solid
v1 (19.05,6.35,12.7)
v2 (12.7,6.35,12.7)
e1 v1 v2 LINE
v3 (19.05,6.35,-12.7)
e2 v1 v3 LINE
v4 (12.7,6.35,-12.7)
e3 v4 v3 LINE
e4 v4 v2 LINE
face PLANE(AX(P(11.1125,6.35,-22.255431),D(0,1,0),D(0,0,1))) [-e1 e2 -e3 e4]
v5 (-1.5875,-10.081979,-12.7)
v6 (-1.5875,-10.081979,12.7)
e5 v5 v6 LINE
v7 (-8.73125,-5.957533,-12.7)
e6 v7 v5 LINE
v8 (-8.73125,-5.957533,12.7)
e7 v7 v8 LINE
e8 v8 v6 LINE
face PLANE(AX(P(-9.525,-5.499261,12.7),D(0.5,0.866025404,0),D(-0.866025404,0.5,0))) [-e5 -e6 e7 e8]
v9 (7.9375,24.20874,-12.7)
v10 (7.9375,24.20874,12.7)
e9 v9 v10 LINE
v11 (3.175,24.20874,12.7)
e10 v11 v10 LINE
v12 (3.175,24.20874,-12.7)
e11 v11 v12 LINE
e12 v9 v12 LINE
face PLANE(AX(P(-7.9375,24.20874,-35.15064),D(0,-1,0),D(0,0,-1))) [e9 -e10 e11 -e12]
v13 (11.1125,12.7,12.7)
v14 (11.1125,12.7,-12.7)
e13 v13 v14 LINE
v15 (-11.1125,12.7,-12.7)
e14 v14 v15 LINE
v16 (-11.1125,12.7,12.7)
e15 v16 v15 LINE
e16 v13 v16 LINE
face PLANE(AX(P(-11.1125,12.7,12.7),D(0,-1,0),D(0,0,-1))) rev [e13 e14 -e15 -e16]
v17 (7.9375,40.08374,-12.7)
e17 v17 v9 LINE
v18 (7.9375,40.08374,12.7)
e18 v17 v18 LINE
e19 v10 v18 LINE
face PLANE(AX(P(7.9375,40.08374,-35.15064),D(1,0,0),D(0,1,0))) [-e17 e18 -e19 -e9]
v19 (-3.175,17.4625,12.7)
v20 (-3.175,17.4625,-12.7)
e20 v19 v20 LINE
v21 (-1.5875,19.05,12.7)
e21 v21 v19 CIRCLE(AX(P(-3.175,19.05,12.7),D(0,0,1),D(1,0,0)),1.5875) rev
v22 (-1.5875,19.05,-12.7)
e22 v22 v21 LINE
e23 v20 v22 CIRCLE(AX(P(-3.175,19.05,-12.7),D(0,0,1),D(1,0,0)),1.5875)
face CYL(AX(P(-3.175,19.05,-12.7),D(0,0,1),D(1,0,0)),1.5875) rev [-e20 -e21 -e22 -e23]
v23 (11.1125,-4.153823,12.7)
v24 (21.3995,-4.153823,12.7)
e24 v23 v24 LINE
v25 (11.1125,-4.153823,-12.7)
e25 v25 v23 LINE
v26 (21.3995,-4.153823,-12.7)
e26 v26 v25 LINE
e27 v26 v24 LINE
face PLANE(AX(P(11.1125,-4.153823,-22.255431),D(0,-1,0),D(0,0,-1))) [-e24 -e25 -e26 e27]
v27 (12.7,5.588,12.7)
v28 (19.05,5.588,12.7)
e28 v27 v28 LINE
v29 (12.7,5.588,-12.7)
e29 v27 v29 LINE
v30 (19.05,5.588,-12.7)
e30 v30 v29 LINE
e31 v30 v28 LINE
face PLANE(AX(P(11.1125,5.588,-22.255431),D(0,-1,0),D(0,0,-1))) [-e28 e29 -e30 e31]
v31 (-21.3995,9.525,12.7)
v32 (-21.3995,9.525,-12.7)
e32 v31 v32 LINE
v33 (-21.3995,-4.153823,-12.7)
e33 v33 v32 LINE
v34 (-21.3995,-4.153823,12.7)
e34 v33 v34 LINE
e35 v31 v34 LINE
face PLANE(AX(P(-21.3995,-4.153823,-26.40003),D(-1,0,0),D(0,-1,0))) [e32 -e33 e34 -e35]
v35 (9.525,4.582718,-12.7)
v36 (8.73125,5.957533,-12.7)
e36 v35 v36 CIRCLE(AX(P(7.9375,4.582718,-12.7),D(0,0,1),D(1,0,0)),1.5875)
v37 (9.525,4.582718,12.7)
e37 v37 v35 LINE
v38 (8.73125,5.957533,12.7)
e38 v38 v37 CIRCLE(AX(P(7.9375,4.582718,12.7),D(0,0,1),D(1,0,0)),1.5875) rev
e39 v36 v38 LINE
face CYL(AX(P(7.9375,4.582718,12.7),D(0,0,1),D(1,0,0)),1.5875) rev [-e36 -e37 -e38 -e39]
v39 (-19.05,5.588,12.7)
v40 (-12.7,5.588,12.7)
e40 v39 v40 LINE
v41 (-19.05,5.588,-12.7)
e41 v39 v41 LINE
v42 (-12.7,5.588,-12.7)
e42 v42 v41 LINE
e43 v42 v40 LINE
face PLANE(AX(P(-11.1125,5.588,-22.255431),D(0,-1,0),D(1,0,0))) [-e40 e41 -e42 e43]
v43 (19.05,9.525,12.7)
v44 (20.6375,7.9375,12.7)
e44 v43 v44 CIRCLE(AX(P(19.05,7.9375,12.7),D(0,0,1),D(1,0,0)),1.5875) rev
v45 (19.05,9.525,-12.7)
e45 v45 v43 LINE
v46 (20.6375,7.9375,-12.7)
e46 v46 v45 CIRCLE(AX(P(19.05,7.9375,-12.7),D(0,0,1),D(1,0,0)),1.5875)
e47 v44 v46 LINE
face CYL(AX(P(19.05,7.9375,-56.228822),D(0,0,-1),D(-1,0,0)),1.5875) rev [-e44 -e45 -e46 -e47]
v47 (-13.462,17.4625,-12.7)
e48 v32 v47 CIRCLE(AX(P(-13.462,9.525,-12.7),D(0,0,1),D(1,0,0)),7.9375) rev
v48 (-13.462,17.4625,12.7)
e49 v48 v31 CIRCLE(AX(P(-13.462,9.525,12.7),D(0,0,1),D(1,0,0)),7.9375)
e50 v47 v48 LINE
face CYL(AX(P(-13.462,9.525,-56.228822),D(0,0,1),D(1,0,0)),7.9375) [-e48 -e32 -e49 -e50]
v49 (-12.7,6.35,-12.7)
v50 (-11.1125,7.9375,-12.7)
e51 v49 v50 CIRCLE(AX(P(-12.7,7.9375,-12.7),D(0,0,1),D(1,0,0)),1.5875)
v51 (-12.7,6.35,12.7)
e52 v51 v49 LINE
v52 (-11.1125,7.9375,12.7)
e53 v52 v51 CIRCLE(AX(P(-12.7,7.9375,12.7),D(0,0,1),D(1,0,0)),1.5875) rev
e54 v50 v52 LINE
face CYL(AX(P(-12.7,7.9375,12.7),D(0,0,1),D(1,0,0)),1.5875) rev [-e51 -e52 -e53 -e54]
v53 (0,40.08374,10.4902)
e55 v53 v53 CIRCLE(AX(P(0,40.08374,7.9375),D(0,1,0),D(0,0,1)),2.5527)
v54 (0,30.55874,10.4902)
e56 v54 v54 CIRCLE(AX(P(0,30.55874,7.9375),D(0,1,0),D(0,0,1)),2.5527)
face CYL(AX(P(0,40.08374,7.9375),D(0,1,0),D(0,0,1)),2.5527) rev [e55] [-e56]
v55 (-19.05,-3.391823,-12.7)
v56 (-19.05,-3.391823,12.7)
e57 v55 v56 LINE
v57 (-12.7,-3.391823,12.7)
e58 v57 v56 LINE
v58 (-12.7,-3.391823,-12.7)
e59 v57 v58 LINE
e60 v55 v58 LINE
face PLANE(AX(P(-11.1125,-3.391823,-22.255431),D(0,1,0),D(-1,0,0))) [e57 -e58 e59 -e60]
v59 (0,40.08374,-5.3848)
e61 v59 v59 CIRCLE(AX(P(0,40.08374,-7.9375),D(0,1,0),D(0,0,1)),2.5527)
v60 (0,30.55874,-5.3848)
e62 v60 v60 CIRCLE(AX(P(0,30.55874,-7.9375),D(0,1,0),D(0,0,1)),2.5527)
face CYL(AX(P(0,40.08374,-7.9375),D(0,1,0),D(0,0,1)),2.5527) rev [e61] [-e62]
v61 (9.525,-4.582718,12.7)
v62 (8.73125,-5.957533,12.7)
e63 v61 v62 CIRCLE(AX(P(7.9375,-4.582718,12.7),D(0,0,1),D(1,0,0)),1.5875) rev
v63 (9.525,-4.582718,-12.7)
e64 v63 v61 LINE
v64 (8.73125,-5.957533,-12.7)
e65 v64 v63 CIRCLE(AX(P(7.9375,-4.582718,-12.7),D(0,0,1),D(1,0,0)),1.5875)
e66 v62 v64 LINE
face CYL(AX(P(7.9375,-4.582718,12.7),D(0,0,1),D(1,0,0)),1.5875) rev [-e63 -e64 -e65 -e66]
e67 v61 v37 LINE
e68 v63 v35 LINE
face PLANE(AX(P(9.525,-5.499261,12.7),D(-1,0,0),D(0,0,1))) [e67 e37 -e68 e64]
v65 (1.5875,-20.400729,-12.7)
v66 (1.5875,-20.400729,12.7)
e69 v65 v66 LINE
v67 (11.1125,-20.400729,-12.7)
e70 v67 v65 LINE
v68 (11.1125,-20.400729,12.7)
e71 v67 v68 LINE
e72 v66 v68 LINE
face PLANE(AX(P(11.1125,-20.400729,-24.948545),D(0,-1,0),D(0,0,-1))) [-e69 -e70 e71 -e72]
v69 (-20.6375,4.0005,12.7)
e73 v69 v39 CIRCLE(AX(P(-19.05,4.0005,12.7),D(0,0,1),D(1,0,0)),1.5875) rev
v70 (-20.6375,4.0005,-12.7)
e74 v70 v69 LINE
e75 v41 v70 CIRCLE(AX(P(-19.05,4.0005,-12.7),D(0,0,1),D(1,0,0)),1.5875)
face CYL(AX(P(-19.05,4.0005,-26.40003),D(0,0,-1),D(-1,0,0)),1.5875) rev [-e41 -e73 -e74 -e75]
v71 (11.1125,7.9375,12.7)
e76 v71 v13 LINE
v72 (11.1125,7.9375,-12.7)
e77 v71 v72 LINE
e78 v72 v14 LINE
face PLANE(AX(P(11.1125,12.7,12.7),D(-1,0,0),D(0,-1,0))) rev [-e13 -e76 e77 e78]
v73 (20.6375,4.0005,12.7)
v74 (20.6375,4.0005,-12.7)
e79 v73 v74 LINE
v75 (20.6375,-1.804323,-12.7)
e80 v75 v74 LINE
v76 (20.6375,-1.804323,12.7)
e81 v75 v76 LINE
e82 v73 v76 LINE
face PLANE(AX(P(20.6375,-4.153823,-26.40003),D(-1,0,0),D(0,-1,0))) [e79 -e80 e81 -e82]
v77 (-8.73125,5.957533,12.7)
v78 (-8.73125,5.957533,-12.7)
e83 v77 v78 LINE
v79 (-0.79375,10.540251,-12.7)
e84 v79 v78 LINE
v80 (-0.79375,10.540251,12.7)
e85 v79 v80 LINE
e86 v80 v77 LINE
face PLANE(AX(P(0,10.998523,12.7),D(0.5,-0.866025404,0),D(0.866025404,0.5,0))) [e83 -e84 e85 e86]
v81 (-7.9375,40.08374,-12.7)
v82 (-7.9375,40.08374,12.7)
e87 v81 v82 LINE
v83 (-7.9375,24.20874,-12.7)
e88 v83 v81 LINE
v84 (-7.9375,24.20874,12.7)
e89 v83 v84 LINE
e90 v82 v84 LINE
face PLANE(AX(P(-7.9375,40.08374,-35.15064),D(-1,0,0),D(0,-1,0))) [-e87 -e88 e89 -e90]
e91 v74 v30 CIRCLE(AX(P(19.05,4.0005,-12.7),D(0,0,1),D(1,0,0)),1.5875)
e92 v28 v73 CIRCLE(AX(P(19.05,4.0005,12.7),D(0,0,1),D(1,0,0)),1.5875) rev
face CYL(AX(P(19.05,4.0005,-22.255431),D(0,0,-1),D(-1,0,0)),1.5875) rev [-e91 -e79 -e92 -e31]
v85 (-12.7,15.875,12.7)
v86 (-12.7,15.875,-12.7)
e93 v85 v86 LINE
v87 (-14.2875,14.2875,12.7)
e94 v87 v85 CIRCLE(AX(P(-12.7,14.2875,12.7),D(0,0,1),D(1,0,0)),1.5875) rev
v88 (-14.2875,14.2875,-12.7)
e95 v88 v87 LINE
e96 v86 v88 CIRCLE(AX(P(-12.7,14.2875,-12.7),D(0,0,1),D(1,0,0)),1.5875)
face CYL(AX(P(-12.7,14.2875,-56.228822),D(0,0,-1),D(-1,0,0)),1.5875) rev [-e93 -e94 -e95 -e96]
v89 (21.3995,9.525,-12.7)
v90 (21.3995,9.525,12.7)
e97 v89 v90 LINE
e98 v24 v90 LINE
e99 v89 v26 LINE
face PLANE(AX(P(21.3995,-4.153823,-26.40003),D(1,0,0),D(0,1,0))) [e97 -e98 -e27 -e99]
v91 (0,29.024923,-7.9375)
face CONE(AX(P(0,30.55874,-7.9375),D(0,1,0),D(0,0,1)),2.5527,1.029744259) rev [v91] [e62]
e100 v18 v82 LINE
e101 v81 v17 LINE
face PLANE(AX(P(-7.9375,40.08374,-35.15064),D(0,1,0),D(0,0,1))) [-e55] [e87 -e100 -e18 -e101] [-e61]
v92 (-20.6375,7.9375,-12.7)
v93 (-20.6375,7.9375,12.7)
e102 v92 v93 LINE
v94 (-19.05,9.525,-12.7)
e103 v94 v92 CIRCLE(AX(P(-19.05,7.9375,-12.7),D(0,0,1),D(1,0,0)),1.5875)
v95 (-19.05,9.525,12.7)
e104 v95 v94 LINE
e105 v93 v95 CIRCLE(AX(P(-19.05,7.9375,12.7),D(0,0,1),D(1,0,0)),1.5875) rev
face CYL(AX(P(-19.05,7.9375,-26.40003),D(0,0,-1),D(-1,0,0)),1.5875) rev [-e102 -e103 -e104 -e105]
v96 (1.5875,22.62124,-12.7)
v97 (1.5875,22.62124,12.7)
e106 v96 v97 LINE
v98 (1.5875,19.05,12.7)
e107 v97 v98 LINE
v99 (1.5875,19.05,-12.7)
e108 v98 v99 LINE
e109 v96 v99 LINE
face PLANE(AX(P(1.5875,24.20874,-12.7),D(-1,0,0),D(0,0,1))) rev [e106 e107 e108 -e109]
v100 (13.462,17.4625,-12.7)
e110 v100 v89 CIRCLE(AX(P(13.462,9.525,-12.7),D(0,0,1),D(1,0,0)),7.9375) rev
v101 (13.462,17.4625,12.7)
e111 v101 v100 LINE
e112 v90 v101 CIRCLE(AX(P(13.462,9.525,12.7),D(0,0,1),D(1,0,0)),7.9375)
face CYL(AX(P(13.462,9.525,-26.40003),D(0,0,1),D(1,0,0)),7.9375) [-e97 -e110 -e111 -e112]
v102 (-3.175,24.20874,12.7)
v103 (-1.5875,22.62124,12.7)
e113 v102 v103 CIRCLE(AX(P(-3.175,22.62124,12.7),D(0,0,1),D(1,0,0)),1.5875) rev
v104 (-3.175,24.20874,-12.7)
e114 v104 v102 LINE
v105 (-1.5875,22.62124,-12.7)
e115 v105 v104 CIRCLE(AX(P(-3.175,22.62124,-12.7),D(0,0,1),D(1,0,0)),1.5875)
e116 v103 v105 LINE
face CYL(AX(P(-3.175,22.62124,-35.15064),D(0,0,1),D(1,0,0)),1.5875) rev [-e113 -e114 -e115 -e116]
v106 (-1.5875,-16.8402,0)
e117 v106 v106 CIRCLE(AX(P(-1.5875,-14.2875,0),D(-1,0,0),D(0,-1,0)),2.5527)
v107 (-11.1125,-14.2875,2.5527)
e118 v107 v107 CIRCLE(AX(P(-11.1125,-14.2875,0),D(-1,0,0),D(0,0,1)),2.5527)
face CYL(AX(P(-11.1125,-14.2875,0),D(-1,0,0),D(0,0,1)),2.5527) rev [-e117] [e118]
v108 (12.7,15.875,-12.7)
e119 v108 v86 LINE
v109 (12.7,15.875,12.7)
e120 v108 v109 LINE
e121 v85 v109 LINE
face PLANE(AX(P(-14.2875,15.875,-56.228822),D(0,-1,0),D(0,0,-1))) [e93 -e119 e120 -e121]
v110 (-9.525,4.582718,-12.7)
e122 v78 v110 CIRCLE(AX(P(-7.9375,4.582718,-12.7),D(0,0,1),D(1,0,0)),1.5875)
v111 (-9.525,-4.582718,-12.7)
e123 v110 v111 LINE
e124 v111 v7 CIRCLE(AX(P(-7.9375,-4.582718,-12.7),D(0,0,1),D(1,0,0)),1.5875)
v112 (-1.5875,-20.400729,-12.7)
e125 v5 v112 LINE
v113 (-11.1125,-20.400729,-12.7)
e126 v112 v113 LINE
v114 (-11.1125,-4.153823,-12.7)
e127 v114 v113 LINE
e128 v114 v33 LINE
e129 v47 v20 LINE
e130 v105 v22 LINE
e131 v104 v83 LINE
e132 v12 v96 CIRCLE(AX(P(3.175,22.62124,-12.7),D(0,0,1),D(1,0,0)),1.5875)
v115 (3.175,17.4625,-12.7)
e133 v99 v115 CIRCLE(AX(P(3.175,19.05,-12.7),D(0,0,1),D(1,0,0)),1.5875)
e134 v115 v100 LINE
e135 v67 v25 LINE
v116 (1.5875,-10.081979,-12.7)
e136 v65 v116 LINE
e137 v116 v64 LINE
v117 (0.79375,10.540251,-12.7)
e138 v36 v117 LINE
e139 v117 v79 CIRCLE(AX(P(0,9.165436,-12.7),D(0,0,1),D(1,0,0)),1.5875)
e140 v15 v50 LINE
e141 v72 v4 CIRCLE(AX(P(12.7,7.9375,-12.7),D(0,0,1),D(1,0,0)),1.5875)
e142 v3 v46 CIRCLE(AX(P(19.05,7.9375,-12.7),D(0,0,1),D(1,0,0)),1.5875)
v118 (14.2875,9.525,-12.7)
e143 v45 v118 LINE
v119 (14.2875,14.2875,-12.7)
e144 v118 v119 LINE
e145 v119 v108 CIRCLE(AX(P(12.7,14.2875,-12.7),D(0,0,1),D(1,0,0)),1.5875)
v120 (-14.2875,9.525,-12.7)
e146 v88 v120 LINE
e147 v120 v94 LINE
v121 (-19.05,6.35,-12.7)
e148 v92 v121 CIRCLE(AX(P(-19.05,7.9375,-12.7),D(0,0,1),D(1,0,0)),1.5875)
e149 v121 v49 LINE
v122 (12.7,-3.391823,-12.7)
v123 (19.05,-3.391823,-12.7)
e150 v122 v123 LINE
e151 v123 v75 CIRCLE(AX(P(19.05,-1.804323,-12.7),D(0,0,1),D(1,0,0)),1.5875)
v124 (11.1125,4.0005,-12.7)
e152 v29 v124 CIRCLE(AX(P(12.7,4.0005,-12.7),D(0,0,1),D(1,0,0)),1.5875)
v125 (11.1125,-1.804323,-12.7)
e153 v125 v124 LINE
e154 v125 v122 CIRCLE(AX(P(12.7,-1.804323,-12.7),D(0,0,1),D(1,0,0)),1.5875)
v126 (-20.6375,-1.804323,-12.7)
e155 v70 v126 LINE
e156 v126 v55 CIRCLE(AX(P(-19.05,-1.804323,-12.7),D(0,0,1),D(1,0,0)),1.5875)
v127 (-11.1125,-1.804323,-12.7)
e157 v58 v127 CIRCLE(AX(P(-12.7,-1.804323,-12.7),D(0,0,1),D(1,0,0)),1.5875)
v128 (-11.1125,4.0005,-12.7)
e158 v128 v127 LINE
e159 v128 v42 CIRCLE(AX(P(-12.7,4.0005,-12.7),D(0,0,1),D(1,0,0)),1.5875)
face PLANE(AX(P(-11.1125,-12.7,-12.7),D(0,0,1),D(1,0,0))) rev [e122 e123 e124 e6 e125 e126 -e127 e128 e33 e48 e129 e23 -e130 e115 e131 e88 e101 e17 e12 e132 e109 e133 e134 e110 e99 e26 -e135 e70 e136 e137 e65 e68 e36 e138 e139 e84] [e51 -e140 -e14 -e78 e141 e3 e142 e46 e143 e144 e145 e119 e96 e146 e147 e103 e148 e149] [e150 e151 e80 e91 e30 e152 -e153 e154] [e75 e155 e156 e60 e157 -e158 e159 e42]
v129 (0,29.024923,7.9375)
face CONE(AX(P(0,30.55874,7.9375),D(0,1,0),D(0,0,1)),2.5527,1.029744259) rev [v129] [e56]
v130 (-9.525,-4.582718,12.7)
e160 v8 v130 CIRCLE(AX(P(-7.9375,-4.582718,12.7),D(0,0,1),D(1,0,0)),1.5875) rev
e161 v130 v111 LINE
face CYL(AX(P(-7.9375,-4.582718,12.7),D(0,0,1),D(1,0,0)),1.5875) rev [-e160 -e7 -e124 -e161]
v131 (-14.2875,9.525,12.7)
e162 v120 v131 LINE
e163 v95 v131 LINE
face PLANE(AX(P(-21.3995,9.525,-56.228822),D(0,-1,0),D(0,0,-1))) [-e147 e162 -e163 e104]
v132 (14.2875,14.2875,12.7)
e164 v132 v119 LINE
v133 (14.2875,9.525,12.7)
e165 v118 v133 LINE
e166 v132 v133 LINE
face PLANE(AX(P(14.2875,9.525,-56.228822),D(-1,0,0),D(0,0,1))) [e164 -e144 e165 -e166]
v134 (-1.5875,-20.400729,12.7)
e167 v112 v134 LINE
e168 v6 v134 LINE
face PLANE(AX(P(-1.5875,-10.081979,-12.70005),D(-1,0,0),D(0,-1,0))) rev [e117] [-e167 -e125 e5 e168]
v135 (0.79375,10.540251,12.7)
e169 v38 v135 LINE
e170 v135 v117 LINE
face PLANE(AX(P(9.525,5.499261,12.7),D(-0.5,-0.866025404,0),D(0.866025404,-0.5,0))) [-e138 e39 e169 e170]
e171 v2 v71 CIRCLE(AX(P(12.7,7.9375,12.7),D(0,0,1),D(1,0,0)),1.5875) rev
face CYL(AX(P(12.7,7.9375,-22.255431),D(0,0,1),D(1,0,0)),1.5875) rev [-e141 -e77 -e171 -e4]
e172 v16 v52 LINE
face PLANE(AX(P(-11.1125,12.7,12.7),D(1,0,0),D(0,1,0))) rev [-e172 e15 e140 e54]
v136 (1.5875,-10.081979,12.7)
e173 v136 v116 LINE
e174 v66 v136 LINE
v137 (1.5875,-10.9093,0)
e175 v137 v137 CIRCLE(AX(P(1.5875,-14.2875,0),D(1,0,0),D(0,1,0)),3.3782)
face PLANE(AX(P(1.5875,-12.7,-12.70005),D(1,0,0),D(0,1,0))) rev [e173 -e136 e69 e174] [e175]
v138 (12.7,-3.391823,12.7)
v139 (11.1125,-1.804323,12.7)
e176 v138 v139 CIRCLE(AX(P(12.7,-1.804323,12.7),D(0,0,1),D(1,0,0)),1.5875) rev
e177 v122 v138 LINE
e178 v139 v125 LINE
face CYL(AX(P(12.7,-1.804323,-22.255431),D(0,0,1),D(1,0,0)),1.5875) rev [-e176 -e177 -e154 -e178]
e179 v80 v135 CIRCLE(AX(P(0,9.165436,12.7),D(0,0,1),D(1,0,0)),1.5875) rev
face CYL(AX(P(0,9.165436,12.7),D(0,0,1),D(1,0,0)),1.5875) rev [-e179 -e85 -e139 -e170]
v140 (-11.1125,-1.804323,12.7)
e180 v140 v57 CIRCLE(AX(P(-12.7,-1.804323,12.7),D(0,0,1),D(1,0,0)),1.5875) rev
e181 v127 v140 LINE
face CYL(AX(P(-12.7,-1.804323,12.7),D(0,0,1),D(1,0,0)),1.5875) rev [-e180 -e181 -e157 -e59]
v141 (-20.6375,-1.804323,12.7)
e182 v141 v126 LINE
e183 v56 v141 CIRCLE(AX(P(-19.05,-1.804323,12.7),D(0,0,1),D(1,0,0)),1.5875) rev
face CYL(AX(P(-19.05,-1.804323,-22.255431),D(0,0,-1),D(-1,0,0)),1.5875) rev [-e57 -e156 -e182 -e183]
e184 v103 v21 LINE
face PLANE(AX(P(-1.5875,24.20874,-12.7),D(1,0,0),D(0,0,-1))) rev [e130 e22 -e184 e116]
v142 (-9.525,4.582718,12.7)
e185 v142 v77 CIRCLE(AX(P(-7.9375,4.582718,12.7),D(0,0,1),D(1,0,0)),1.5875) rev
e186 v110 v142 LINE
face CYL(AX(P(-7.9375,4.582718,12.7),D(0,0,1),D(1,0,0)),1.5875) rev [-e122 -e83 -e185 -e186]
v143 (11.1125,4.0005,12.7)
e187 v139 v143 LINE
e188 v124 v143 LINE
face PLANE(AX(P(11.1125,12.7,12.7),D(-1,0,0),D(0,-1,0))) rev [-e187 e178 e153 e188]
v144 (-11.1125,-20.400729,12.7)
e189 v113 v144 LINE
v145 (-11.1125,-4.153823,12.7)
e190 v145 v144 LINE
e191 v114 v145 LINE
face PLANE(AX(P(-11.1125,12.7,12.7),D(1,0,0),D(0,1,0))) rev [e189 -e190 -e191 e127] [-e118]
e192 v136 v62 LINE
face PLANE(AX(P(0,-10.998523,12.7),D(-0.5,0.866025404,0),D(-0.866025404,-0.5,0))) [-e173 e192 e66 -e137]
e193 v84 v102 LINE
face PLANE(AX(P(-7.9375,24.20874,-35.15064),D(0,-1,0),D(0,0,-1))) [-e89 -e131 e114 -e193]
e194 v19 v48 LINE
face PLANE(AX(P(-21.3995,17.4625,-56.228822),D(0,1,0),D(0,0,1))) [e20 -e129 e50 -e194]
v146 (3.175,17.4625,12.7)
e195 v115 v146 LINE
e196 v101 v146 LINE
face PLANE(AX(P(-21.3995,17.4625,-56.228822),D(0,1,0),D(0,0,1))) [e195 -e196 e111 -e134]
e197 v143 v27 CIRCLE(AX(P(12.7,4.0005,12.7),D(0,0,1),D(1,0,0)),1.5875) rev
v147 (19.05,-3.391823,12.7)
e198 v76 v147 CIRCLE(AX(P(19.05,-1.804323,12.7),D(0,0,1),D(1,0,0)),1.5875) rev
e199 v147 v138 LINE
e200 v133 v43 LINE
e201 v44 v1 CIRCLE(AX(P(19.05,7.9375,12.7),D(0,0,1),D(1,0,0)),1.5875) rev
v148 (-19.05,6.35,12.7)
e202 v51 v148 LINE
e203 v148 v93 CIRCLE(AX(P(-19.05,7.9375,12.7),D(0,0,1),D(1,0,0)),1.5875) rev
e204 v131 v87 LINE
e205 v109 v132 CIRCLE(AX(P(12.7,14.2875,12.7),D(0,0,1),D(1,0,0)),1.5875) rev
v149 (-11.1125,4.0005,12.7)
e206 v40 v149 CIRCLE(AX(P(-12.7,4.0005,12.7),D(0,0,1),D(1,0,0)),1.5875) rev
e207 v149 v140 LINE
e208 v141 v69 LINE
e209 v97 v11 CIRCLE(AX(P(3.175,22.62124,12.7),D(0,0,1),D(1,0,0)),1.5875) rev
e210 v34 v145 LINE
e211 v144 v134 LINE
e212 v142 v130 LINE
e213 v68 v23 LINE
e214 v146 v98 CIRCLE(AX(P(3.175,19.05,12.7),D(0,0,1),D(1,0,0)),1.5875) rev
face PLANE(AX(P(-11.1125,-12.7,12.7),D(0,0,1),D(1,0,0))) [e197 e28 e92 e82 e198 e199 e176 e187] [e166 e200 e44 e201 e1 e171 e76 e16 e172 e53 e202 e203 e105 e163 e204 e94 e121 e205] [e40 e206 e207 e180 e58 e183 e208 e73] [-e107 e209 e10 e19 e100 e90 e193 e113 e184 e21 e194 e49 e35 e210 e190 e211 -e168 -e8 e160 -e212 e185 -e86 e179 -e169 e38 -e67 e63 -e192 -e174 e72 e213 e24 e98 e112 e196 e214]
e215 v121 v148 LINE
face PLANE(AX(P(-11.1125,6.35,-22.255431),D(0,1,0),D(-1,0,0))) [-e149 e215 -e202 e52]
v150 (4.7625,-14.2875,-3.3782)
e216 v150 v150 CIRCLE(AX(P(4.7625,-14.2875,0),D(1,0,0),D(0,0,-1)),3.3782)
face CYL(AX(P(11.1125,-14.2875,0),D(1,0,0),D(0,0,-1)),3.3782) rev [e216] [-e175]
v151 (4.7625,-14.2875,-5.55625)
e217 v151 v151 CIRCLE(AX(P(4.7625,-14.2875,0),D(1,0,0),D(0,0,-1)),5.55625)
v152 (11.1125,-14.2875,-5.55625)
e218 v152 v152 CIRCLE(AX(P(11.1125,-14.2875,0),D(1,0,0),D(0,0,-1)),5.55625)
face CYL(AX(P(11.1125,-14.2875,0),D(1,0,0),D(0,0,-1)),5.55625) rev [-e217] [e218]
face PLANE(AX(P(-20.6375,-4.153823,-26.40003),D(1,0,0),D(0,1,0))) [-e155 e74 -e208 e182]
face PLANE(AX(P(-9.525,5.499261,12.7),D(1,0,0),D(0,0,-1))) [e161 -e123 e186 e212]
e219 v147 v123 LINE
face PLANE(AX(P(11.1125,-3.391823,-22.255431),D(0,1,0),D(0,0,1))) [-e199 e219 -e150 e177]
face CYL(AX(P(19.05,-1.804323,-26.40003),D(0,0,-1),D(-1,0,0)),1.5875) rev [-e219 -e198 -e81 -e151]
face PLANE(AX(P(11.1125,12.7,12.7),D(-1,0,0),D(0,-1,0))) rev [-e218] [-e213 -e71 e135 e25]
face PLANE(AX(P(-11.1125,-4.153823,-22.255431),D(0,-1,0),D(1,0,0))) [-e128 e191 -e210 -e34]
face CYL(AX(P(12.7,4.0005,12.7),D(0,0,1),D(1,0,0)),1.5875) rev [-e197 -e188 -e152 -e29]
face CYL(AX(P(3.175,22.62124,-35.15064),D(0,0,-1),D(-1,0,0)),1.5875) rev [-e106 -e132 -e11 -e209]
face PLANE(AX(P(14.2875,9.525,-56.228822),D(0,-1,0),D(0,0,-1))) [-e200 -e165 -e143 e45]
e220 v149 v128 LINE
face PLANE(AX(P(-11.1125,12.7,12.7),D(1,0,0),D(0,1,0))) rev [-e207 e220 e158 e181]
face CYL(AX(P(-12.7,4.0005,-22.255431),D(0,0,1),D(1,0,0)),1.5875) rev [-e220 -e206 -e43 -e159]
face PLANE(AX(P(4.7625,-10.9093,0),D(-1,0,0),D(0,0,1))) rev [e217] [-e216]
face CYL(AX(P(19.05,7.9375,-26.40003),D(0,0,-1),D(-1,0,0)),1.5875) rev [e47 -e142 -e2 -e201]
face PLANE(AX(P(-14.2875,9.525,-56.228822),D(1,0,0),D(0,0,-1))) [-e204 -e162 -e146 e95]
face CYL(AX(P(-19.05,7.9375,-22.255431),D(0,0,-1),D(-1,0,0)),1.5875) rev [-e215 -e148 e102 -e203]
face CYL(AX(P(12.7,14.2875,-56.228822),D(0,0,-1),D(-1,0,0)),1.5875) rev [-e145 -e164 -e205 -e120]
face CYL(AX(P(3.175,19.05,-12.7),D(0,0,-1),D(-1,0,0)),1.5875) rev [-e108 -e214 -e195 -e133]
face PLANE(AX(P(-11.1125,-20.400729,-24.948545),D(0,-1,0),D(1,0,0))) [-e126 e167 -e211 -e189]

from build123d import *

# Parameters (mm, degrees)
SKETCH1_W                                        = 22.225
SKETCH1_H                                        = 25.4
EXTRUDE1_DEPTH                                   = 12.7
SKETCH2_W                                        = 9.525
SKETCH2_H                                        = 0.762
EXTRUDE2_DEPTH                                   = 25.4
SKETCH3_W                                        = 0.762
SKETCH3_H                                        = 13.678822609
EXTRUDE3_DEPTH                                   = 25.4
EXTRUDE4_DEPTH                                   = 25.4
SKETCH7_W                                        = 3.175
SKETCH7_H                                        = 25.4
EXTRUDE5_DEPTH                                   = 6.74624
SKETCH8_W                                        = 15.875
SKETCH8_H                                        = 15.875
EXTRUDE6_DEPTH                                   = 25.4
F_1_4_20_TAPPED_HOLE1_D                          = 5.1054
F_1_4_20_TAPPED_HOLE1_DEPTH                      = 9.525
F_1_4_20_TAPPED_HOLE1_TIP                        = 1.533816902
EXTRUDE7_DEPTH                                   = 53.055785583
SKETCH10_W                                       = 9.525
SKETCH10_H                                       = 7.700729076
EXTRUDE8_DEPTH                                   = 25.4
CBORE_FOR_1_4_SOCKET_HEAD_CAP_SCREW1_D           = 6.7564
CBORE_FOR_1_4_SOCKET_HEAD_CAP_SCREW1_DEPTH       = 9.525
CBORE_FOR_1_4_SOCKET_HEAD_CAP_SCREW1_CBORE_D     = 11.1125
CBORE_FOR_1_4_SOCKET_HEAD_CAP_SCREW1_CBORE_DEPTH = 6.35
F_1_4_20_TAPPED_HOLE2_D                          = 5.1054
FILLET1_R                                        = 1.5875
FILLET2_R                                        = 7.9375


with BuildPart() as part:
    # Sketch1 → Extrude1 (new, symmetric)
    with BuildSketch(Plane.XY):
        Rectangle(SKETCH1_W, SKETCH1_H)
        Polygon((0, 10.998522628), (-9.525, 5.499261314), (-9.525, -5.499261314), (0, -10.998522628), (9.525, -5.499261314), (9.525, 5.499261314), align=None, mode=Mode.SUBTRACT)
    extrude(amount=EXTRUDE1_DEPTH, both=True)

    # Sketch2 → Extrude2 (add)
    with BuildSketch(Plane.XY.offset(12.7)):
        with Locations((15.875, 5.969)):
            Rectangle(SKETCH2_W, SKETCH2_H)
        with Locations((15.875, -3.772822609)):
            Rectangle(SKETCH2_W, SKETCH2_H)
        with Locations((-15.875, -3.772822609)):
            Rectangle(SKETCH2_W, SKETCH2_H)
        with Locations((-15.875, 5.969)):
            Rectangle(SKETCH2_W, SKETCH2_H)
    extrude(amount=-EXTRUDE2_DEPTH)

    # Sketch3 → Extrude3 (add)
    with BuildSketch(Plane.XY.offset(12.7)):
        with Locations((21.0185, 2.685588695)):
            Rectangle(SKETCH3_W, SKETCH3_H)
        with Locations((-21.0185, 2.685588695)):
            Rectangle(SKETCH3_W, SKETCH3_H)
    extrude(amount=-EXTRUDE3_DEPTH)

    # Sketch4 → Extrude4 (add)
    with BuildSketch(Plane.XY.offset(12.7)):
        Polygon((-21.3995, 17.4625), (21.3995, 17.4625), (21.3995, 9.525), (14.2875, 9.525), (14.2875, 15.875), (-14.2875, 15.875), (-14.2875, 9.525), (-21.3995, 9.525), align=None)
    extrude(amount=-EXTRUDE4_DEPTH)

    # Sketch7 → Extrude5 (add)
    with BuildSketch(Plane(origin=(0, 17.4625, 0), x_dir=(1, 0, 0), z_dir=(0, 1, 0))):
        Rectangle(SKETCH7_W, SKETCH7_H)
    extrude(amount=EXTRUDE5_DEPTH)

    # Sketch8 → Extrude6 (add)
    with BuildSketch(Plane.XY.offset(12.7)):
        with Locations((0, 32.14624)):
            Rectangle(SKETCH8_W, SKETCH8_H)
    extrude(amount=-EXTRUDE6_DEPTH)

    # 1/4-20 Tapped Hole1
    with Locations(Plane(origin=(-10.978640872, 40.08374, -1.669383244), x_dir=(-1, 0, 0), z_dir=(0, 1, 0))):
        with Locations((-10.978640872, -6.268116756), (-10.978640872, 9.606883244)):
            Hole(F_1_4_20_TAPPED_HOLE1_D / 2, depth=F_1_4_20_TAPPED_HOLE1_DEPTH)
            with Locations((0, 0, -(F_1_4_20_TAPPED_HOLE1_DEPTH + F_1_4_20_TAPPED_HOLE1_TIP / 2))):  # 118° drill point
                Cone(0, F_1_4_20_TAPPED_HOLE1_D / 2, F_1_4_20_TAPPED_HOLE1_TIP, mode=Mode.SUBTRACT)

    # Sketch9 → Extrude7 (cut, through all)
    with BuildSketch(Plane.XY.offset(12.7)):
        Polygon((-1.5875, -10.081979076), (-1.5875, -12.7), (1.5875, -12.7), (1.5875, -10.081979076), (0, -10.998522628), align=None)
    extrude(amount=-EXTRUDE7_DEPTH, mode=Mode.SUBTRACT)

    # Sketch10 → Extrude8 (add)
    with BuildSketch(Plane.XY.offset(12.7)):
        with Locations((6.35, -16.550364538)):
            Rectangle(SKETCH10_W, SKETCH10_H)
        with Locations((-6.35, -16.550364538)):
            Rectangle(SKETCH10_W, SKETCH10_H)
    extrude(amount=-EXTRUDE8_DEPTH)

    # CBORE for 1/4 Socket Head Cap Screw1
    with Locations(Plane(origin=(11.1125, 0, 0), x_dir=(0, 0, -1), z_dir=(1, 0, 0))):
        with Locations((0, -14.2875)):
            CounterBoreHole(CBORE_FOR_1_4_SOCKET_HEAD_CAP_SCREW1_D / 2, CBORE_FOR_1_4_SOCKET_HEAD_CAP_SCREW1_CBORE_D / 2, CBORE_FOR_1_4_SOCKET_HEAD_CAP_SCREW1_CBORE_DEPTH, depth=CBORE_FOR_1_4_SOCKET_HEAD_CAP_SCREW1_DEPTH)

    # 1/4-20 Tapped Hole2 (through all)
    with Locations(Plane.ZY.offset(11.1125)):
        with Locations((0, -14.2875)):
            Hole(F_1_4_20_TAPPED_HOLE2_D / 2)

    # Fillet1
    fillet1_edges = [part.edges().sort_by_distance(p)[0] for p in [
        (-1.5875, 17.4625, 0),
        (1.5875, 17.4625, 0),
        (1.5875, 24.20874, 0),
        (-1.5875, 24.20874, 0),
        (11.1125, 5.588, 0),
        (20.6375, -3.391822609, 0),
        (-11.1125, -3.391822609, 0),
        (-11.1125, 5.588, 0),
        (20.6375, 5.588, 0),
        (11.1125, -3.391822609, 0),
        (-20.6375, -3.391822609, 0),
        (-20.6375, 6.35, 0),
        (-20.6375, 9.525, 0),
        (-20.6375, 5.588, 0),
        (9.525, -5.499261314, 0),
        (9.525, 5.499261314, 0),
        (0, 10.998522628, 0),
        (-9.525, 5.499261314, 0),
        (-9.525, -5.499261314, 0),
        (-11.1125, 6.35, 0),
        (-14.2875, 15.875, 0),
        (14.2875, 15.875, 0),
        (20.6375, 6.35, 0),
        (20.6375, 9.525, 0),
        (11.1125, 6.35, 0),
    ]]
    fillet(fillet1_edges, radius=FILLET1_R - 0.0001)  # a hair under: the kernel refuses the full size

    # Fillet2
    fillet2_edges = [part.edges().sort_by_distance(p)[0] for p in [
        (21.3995, 17.4625, 0),
        (-21.3995, 17.4625, 0),
    ]]
    fillet(fillet2_edges, radius=FILLET2_R)


solid = part.part
